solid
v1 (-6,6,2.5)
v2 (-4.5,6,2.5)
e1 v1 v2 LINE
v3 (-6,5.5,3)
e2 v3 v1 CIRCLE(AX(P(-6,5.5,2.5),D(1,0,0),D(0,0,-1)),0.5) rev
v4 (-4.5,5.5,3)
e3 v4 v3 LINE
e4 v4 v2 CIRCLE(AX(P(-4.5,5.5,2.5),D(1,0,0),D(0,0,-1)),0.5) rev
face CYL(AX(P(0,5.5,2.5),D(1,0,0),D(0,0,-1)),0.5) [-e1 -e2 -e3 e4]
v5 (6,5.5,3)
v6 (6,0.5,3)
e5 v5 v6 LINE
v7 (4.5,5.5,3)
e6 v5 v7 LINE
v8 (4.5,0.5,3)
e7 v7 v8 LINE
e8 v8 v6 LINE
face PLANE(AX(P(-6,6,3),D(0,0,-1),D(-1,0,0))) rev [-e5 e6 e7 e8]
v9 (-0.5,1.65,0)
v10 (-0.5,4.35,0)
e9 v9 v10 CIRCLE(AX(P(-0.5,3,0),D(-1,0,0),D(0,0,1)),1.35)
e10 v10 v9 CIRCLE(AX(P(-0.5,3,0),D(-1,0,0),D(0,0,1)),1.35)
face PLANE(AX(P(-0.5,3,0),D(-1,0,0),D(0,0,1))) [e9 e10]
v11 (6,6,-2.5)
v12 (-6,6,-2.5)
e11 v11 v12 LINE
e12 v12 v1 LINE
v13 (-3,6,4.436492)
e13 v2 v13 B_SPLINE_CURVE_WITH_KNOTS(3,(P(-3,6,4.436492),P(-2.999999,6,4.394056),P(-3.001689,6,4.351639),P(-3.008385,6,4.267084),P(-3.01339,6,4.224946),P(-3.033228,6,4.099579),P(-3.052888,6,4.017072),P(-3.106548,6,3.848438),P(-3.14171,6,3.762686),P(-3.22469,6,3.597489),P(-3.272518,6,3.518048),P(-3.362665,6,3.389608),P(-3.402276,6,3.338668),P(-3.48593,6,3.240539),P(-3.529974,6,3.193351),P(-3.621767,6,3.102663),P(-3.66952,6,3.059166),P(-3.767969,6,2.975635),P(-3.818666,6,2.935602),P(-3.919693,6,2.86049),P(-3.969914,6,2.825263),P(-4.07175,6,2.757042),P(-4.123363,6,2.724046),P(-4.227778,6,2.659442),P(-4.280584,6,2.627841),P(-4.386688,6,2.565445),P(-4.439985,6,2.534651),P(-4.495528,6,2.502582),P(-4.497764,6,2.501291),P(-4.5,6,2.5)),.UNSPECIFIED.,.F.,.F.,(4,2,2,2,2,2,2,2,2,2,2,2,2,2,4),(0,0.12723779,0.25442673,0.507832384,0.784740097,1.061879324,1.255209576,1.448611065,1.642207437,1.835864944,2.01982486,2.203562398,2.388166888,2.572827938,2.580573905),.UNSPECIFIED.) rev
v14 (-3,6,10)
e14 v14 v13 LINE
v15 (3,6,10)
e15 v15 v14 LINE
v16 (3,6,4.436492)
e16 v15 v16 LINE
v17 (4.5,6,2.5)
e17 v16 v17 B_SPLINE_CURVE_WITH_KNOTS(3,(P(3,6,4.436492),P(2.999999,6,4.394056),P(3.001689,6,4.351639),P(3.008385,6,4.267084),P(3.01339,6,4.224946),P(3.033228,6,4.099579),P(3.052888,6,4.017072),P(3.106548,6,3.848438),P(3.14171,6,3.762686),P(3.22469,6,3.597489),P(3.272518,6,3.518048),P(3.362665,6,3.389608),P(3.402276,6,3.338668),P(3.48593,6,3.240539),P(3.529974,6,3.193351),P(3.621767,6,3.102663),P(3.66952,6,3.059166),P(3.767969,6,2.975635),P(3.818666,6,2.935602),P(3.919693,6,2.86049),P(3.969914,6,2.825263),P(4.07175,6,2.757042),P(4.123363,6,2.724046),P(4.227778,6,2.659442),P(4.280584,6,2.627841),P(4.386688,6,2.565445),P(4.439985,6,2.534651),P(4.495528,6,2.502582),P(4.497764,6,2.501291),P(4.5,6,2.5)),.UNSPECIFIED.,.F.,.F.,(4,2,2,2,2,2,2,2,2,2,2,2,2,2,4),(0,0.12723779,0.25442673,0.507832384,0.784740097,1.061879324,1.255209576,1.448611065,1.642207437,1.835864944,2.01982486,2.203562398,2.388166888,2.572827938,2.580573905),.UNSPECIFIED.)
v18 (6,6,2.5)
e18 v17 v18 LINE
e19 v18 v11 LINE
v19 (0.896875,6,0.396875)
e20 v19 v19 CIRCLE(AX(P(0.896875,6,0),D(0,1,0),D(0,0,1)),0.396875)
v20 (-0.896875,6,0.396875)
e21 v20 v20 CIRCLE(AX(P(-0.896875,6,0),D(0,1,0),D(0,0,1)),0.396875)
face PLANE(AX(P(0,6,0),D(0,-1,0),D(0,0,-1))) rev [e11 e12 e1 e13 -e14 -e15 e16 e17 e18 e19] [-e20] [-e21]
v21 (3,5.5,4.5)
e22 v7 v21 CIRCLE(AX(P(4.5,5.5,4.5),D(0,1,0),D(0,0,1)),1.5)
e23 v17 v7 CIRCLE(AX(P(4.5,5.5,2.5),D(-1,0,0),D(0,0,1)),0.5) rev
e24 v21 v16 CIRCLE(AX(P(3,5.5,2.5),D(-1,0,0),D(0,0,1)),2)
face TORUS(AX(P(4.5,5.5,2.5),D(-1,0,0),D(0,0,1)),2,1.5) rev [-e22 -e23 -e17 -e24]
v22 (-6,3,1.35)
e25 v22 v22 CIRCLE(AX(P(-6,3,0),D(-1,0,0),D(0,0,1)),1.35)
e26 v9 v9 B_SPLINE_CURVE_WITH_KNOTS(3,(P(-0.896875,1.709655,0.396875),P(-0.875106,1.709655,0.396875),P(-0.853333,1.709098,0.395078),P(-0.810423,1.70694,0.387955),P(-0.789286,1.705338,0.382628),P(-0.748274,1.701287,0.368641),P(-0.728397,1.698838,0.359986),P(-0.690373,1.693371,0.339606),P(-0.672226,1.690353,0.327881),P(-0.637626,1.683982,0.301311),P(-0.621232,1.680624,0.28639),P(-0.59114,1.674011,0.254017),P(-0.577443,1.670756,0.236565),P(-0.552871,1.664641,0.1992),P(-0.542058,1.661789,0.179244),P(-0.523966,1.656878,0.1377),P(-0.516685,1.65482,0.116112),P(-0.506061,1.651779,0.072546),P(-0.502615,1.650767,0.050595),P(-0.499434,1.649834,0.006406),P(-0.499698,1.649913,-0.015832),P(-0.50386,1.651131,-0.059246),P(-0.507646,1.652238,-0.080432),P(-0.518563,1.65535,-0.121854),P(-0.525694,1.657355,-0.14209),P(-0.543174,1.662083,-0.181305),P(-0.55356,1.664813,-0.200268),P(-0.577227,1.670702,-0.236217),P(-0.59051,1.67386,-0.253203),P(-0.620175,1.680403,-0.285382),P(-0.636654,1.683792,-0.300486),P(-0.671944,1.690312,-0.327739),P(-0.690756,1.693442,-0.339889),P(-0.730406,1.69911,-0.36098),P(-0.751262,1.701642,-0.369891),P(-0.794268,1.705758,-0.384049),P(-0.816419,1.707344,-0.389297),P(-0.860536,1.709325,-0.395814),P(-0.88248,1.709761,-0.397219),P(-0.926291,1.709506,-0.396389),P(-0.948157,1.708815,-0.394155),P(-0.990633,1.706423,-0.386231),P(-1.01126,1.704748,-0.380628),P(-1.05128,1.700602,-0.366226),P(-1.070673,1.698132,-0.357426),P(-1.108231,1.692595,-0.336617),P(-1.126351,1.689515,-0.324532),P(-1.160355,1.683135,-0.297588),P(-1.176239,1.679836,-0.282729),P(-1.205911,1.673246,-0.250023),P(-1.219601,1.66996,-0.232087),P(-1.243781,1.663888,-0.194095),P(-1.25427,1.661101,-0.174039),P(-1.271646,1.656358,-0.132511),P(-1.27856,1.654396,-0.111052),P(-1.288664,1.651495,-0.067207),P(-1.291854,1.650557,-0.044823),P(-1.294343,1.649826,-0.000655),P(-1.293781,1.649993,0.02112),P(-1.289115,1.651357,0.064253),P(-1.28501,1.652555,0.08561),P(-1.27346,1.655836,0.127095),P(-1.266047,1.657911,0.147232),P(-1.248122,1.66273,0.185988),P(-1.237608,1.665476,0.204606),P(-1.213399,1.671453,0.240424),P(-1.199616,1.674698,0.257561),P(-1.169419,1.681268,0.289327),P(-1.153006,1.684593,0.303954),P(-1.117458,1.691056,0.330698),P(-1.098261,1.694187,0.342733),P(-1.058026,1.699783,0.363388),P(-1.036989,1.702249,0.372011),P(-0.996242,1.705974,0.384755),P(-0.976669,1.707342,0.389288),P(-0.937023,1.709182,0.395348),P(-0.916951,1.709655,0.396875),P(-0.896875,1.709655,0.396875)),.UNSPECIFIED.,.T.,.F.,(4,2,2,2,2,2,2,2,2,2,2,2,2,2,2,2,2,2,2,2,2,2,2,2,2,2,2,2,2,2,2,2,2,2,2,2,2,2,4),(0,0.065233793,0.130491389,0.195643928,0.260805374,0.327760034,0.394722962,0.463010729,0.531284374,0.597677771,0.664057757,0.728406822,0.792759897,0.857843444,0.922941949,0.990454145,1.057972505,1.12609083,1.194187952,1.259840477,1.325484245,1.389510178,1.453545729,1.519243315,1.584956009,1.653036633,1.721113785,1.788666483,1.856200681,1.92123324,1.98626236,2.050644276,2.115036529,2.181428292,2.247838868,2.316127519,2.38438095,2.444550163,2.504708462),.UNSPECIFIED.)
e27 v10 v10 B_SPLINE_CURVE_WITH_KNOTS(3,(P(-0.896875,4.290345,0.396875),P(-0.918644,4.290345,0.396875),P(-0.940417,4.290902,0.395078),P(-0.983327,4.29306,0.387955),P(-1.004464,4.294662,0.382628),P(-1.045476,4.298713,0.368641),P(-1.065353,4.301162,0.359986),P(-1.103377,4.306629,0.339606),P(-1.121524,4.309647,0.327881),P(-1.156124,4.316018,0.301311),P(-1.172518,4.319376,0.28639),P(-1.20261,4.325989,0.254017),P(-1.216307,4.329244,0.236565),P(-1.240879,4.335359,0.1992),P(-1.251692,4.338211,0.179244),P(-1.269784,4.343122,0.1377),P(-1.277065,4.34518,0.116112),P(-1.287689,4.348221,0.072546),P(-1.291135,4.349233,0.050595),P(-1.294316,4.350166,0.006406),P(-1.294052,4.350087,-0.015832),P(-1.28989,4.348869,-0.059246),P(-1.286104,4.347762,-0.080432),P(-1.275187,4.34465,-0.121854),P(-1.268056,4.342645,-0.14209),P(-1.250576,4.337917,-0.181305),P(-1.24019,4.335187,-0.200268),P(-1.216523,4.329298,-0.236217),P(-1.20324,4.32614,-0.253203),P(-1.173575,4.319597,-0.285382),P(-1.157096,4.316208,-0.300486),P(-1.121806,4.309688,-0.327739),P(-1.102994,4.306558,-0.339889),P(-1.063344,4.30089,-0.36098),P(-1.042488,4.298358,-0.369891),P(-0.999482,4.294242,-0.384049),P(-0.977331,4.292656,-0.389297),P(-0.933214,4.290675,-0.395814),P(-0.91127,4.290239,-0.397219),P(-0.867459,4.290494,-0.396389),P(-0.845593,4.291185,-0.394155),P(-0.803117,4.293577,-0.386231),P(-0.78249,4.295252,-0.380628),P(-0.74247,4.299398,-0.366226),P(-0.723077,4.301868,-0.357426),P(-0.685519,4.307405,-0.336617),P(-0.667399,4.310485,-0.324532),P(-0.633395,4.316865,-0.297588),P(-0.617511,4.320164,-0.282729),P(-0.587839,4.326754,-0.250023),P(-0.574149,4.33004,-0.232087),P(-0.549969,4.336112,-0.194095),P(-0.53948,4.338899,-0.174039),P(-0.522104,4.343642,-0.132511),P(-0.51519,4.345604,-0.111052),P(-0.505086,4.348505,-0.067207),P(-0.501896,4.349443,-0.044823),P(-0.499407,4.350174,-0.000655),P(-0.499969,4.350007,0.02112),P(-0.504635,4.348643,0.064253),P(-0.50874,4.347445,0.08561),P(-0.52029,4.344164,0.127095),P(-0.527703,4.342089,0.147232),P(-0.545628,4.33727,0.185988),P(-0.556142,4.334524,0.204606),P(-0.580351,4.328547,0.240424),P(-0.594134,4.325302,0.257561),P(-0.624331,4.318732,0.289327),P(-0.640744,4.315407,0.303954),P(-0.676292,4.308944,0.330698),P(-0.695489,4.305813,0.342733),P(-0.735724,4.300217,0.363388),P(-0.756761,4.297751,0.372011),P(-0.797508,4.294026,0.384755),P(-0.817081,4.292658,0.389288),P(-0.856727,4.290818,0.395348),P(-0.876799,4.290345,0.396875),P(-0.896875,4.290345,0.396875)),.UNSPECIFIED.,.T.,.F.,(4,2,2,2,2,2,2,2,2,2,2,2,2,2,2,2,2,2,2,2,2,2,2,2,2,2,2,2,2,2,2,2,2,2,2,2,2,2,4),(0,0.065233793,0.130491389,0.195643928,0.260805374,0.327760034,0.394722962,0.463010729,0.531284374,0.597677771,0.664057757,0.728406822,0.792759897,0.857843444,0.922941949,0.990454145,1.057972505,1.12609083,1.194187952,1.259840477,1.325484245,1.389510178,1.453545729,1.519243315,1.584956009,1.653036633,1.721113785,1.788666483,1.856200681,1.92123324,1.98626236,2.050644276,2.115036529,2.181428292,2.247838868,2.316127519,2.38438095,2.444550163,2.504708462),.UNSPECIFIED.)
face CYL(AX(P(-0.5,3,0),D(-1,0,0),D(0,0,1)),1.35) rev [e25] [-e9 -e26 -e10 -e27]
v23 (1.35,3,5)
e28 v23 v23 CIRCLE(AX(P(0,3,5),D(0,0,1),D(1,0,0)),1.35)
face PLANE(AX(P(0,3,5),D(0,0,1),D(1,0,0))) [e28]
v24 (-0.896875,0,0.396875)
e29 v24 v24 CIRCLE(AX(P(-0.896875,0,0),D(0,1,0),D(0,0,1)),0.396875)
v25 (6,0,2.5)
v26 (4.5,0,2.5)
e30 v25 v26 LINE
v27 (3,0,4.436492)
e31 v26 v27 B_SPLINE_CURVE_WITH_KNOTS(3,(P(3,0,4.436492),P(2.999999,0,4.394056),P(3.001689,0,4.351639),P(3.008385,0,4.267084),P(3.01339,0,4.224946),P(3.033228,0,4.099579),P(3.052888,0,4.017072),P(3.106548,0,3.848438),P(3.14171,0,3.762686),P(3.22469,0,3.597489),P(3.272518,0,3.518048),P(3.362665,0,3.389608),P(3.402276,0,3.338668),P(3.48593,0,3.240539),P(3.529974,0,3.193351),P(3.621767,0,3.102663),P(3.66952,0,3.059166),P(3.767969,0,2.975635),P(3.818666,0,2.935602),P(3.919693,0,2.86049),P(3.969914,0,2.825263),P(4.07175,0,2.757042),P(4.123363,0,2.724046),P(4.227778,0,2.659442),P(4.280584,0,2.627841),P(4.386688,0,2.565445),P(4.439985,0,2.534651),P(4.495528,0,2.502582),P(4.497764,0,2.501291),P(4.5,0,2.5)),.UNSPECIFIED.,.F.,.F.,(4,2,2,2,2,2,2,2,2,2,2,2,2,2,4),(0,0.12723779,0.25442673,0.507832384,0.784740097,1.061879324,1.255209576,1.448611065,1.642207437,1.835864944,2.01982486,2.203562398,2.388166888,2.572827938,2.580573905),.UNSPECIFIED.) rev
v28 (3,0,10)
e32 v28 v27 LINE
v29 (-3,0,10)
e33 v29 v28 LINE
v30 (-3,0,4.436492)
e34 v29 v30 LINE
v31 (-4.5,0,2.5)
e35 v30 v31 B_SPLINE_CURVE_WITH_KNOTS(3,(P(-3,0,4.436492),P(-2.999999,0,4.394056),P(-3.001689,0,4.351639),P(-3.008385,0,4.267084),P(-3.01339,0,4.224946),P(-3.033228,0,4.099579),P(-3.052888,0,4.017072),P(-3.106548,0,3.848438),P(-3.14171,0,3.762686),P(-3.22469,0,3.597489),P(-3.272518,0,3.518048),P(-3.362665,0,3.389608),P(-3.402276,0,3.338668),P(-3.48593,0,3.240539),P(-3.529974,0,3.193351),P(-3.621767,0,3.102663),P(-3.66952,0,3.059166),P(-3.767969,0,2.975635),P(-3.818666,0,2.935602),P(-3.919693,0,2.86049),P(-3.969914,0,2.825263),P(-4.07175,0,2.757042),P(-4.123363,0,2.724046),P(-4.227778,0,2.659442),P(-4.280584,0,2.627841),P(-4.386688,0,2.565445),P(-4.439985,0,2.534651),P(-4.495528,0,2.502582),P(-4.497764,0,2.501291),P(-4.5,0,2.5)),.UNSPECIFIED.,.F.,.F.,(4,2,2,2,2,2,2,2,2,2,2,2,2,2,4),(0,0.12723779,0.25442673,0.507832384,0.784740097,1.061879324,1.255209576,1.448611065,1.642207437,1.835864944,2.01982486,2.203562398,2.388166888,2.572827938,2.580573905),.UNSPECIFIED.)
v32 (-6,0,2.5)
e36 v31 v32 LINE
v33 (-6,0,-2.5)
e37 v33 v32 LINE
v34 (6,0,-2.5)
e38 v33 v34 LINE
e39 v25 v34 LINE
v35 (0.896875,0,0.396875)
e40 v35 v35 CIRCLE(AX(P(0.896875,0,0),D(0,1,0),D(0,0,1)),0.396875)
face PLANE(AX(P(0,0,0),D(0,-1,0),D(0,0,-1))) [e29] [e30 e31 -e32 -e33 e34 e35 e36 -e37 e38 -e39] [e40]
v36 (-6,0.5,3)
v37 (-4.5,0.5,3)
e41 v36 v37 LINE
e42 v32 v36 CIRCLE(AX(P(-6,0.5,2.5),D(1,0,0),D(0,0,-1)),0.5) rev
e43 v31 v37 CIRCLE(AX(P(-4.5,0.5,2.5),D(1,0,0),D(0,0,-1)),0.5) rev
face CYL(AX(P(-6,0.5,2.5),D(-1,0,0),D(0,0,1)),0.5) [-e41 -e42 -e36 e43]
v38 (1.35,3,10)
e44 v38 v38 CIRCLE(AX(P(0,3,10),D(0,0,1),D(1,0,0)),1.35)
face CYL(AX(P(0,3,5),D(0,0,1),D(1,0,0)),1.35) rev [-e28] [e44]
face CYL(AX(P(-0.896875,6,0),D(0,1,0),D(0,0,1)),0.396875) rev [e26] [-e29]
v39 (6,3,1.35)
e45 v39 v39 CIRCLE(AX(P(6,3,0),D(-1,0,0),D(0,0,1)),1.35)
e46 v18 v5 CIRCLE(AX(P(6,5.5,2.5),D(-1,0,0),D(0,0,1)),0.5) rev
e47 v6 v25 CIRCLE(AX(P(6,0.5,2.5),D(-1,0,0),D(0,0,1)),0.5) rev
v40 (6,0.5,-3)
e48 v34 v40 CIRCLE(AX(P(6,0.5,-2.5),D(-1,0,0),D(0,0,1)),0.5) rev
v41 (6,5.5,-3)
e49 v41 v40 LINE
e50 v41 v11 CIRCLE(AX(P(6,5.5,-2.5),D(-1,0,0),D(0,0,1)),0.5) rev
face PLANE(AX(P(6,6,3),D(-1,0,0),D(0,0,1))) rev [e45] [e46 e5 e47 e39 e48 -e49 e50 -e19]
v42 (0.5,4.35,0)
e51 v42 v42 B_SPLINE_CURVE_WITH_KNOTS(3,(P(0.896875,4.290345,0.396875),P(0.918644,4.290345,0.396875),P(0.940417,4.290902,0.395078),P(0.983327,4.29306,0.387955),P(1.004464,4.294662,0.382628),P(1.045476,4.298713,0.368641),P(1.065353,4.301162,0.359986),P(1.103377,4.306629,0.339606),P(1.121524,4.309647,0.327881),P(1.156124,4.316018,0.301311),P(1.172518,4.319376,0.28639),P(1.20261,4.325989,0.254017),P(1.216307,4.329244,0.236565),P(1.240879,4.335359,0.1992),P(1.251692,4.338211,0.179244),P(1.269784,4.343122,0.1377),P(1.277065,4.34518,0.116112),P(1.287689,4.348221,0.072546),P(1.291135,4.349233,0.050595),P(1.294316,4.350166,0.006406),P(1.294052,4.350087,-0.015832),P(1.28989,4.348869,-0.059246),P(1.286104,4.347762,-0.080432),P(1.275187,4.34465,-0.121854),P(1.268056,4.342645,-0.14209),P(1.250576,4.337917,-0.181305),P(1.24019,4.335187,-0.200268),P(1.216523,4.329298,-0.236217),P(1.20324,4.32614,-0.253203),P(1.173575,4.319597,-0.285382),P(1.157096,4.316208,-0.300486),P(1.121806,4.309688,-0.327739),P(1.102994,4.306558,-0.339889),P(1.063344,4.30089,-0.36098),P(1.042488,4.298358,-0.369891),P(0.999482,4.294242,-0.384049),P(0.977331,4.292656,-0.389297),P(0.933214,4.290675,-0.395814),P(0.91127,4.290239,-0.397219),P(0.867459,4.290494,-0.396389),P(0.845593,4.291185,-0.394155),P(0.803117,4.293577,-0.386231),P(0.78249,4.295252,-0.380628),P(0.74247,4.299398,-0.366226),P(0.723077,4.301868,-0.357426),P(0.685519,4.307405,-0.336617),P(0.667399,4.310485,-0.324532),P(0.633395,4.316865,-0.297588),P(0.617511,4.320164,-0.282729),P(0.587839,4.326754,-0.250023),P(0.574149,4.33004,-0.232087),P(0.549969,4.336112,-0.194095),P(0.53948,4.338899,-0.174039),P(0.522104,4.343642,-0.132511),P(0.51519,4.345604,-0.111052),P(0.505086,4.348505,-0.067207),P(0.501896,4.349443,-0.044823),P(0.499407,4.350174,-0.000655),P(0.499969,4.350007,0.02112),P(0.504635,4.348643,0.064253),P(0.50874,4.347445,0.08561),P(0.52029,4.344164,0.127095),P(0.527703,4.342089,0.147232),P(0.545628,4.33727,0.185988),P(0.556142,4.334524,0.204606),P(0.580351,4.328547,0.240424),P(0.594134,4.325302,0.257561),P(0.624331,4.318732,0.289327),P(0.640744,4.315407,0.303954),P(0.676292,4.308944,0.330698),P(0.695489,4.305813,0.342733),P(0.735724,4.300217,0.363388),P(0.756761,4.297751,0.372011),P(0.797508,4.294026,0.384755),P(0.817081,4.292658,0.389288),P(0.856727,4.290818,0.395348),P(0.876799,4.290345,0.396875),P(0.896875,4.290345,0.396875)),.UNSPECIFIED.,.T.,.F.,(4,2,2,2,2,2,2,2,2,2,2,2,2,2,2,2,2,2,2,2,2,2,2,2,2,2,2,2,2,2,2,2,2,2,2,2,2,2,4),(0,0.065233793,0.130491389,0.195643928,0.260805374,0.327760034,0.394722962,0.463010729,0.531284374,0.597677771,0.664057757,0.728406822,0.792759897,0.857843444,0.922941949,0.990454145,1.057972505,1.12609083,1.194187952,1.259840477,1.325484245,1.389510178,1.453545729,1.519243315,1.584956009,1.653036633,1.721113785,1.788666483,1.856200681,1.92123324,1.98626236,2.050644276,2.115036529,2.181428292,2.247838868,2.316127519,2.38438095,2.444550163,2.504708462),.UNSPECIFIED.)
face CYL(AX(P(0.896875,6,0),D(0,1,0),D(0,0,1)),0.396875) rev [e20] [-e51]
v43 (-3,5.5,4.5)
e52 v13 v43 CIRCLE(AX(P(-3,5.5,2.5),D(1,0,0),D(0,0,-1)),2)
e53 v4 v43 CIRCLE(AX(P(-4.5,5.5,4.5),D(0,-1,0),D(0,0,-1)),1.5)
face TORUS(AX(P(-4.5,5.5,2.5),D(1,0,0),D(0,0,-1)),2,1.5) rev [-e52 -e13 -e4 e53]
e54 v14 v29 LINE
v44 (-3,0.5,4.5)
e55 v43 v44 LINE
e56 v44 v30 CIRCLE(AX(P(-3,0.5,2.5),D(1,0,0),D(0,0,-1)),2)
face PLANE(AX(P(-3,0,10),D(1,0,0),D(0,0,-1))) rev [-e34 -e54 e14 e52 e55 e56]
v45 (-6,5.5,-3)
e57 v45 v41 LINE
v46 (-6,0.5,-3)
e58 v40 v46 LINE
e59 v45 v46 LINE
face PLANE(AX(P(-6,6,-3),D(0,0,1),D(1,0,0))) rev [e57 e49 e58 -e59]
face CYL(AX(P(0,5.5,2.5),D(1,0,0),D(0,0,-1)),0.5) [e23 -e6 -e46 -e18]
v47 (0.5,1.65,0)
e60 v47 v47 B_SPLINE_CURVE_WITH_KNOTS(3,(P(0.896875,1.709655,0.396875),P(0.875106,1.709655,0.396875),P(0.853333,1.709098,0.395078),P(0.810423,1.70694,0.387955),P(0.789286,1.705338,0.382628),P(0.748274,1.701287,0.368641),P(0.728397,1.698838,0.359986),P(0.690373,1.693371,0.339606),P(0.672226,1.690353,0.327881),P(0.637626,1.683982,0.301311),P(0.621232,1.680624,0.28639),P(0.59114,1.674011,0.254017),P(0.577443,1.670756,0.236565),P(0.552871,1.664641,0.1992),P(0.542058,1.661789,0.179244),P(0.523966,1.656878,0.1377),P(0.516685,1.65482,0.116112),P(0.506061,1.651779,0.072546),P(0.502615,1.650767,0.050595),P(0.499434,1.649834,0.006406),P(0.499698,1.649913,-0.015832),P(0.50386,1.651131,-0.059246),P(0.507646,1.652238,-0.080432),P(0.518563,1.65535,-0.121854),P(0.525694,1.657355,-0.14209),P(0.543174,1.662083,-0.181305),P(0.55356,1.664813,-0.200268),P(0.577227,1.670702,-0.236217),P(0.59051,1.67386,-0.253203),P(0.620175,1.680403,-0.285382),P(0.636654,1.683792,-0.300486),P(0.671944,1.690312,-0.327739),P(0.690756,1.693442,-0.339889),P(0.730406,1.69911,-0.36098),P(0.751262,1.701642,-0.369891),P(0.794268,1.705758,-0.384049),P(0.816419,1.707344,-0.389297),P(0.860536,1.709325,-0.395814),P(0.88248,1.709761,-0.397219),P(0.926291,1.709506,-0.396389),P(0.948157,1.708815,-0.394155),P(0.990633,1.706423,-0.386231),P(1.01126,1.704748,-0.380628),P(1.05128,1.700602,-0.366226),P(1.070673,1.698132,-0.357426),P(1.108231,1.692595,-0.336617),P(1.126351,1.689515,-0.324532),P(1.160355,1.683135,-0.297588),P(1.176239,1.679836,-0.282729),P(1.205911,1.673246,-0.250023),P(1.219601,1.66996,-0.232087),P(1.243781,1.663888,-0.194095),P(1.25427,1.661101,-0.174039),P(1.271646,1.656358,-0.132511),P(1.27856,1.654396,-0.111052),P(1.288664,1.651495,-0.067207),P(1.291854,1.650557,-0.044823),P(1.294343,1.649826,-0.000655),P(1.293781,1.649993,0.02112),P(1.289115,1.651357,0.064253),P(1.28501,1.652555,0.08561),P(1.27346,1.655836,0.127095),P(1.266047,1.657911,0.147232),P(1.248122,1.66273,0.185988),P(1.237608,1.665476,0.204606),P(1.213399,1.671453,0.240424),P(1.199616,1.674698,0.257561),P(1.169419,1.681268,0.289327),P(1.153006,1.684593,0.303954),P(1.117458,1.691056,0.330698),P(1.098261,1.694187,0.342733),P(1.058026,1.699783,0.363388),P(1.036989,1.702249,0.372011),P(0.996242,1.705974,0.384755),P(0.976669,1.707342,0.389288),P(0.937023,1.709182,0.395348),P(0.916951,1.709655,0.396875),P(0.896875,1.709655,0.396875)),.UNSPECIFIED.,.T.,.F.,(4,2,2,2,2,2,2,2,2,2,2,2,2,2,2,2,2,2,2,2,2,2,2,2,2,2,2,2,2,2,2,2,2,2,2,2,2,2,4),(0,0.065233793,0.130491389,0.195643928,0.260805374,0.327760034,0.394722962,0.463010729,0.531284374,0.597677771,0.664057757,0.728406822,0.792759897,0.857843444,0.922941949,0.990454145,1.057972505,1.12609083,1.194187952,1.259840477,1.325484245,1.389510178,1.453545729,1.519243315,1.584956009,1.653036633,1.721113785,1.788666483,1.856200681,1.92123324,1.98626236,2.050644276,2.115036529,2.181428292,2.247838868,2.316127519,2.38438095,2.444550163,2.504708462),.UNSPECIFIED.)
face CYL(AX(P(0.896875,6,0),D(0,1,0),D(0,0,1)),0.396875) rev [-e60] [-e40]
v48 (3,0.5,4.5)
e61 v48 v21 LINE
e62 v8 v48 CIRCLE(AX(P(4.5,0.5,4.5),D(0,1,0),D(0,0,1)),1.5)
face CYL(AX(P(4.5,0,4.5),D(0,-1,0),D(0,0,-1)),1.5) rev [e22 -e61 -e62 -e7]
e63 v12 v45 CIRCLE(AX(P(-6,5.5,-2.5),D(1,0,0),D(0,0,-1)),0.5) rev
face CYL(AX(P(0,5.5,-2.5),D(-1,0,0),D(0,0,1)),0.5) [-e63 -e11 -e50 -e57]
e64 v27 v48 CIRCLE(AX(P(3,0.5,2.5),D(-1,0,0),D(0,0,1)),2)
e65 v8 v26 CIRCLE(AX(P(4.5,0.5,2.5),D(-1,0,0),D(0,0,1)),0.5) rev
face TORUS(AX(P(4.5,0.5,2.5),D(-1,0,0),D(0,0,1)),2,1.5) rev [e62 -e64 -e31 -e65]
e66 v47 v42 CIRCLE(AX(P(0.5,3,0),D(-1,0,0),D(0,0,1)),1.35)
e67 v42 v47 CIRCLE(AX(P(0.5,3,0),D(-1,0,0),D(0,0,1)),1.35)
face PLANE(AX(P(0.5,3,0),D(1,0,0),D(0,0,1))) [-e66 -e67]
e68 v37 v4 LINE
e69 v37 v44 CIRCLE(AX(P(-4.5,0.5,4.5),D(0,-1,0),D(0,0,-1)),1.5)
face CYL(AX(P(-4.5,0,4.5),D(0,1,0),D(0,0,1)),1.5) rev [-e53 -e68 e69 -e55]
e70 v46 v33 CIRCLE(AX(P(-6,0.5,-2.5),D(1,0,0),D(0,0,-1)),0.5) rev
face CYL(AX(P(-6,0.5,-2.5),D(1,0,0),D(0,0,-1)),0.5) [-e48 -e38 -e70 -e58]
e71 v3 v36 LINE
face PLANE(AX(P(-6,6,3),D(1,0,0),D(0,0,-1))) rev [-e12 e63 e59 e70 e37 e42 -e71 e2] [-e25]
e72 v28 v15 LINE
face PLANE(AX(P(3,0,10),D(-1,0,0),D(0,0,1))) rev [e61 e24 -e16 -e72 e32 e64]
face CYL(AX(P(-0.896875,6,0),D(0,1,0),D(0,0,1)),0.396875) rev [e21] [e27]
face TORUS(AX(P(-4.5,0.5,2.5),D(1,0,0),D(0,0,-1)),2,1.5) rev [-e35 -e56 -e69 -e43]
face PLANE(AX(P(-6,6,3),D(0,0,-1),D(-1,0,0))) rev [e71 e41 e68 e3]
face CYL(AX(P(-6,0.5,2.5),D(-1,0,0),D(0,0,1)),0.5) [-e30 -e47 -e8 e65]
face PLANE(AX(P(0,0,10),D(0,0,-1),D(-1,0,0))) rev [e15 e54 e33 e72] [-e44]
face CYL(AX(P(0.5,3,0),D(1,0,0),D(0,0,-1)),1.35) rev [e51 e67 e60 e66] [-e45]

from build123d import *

# Parameters (mm, degrees)
SKETCH1_W                       = 12
SKETCH1_H                       = 6
BOSS_EXTRUDE1_DEPTH             = 6
F_1_32_0_03125_DIAMETER_HOLE1_D = 0.79375
SKETCH15_W                      = 6
SKETCH15_H                      = 6
BOSS_EXTRUDE2_DEPTH             = 7
FILLET4_R                       = 0.5
FILLET3_R                       = 1.5
SKETCH19_R                      = 1.35
CUT_EXTRUDE1_DEPTH              = 5.5
SKETCH16_R                      = 1.35
CUT_EXTRUDE2_DEPTH              = 5


with BuildPart() as part:
    # Sketch1 → Boss-Extrude1 (new body)
    with BuildSketch(Plane(origin=(0, 0, 0), x_dir=(1, 0, 0), z_dir=(0, 1, 0))):
        Rectangle(SKETCH1_W, SKETCH1_H)
    extrude(amount=BOSS_EXTRUDE1_DEPTH)

    # 1/32 (0.03125) Diameter Hole1 (through all)
    with Locations(Plane(origin=(0, 6, 0), x_dir=(1, 0, 0), z_dir=(0, 1, 0))):
        with Locations((0.896875, 0), (-0.896875, 0)):
            Hole(F_1_32_0_03125_DIAMETER_HOLE1_D / 2)

    # Sketch15 → Boss-Extrude2 (add)
    with BuildSketch(Plane.XY.offset(3)):
        with Locations((0, 3)):
            Rectangle(SKETCH15_W, SKETCH15_H)
    extrude(amount=BOSS_EXTRUDE2_DEPTH)

    # Fillet4
    fillet4_edges = [part.edges().sort_by_distance(p)[0] for p in [
        (4.5, 6, 3),
        (4.5, 0, 3),
        (-4.5, 0, 3),
        (0, 0, -3),
        (0, 6, -3),
        (-4.5, 6, 3),
    ]]
    fillet(fillet4_edges, radius=FILLET4_R)

    # Fillet3
    fillet3_edges = [part.edges().sort_by_distance(p)[0] for p in [
        (-3, 3, 3),
        (-3, 0.146446609, 2.853553391),
        (-3, 5.853553391, 2.853553391),
    ]]
    fillet(fillet3_edges, radius=FILLET3_R)
    fillet3_2_edges = [part.edges().sort_by_distance(p)[0] for p in [
        (3, 5.853553391, 2.853553391),
        (3, 3, 3),
        (3, 0.146446609, 2.853553391),
    ]]
    fillet(fillet3_2_edges, radius=FILLET3_R)

    # Sketch19 → Cut-Extrude1 (cut)
    with BuildSketch(Plane.ZY.offset(6)):
        with Locations((0, 3)):
            Circle(SKETCH19_R)
    cut_extrude1 = extrude(amount=-CUT_EXTRUDE1_DEPTH, mode=Mode.SUBTRACT)

    # Sketch16 → Cut-Extrude2 (cut)
    with BuildSketch(Plane.XY.offset(10)):
        with Locations((0, 3)):
            Circle(SKETCH16_R)
    extrude(amount=-CUT_EXTRUDE2_DEPTH, mode=Mode.SUBTRACT)

    # Mirror2: Cut-Extrude1 across plane
    add(cut_extrude1.mirror(Plane(origin=(0, 0, 0), x_dir=(0, 0, 1), z_dir=(1, 0, 0))), mode=Mode.SUBTRACT)


solid = part.part
